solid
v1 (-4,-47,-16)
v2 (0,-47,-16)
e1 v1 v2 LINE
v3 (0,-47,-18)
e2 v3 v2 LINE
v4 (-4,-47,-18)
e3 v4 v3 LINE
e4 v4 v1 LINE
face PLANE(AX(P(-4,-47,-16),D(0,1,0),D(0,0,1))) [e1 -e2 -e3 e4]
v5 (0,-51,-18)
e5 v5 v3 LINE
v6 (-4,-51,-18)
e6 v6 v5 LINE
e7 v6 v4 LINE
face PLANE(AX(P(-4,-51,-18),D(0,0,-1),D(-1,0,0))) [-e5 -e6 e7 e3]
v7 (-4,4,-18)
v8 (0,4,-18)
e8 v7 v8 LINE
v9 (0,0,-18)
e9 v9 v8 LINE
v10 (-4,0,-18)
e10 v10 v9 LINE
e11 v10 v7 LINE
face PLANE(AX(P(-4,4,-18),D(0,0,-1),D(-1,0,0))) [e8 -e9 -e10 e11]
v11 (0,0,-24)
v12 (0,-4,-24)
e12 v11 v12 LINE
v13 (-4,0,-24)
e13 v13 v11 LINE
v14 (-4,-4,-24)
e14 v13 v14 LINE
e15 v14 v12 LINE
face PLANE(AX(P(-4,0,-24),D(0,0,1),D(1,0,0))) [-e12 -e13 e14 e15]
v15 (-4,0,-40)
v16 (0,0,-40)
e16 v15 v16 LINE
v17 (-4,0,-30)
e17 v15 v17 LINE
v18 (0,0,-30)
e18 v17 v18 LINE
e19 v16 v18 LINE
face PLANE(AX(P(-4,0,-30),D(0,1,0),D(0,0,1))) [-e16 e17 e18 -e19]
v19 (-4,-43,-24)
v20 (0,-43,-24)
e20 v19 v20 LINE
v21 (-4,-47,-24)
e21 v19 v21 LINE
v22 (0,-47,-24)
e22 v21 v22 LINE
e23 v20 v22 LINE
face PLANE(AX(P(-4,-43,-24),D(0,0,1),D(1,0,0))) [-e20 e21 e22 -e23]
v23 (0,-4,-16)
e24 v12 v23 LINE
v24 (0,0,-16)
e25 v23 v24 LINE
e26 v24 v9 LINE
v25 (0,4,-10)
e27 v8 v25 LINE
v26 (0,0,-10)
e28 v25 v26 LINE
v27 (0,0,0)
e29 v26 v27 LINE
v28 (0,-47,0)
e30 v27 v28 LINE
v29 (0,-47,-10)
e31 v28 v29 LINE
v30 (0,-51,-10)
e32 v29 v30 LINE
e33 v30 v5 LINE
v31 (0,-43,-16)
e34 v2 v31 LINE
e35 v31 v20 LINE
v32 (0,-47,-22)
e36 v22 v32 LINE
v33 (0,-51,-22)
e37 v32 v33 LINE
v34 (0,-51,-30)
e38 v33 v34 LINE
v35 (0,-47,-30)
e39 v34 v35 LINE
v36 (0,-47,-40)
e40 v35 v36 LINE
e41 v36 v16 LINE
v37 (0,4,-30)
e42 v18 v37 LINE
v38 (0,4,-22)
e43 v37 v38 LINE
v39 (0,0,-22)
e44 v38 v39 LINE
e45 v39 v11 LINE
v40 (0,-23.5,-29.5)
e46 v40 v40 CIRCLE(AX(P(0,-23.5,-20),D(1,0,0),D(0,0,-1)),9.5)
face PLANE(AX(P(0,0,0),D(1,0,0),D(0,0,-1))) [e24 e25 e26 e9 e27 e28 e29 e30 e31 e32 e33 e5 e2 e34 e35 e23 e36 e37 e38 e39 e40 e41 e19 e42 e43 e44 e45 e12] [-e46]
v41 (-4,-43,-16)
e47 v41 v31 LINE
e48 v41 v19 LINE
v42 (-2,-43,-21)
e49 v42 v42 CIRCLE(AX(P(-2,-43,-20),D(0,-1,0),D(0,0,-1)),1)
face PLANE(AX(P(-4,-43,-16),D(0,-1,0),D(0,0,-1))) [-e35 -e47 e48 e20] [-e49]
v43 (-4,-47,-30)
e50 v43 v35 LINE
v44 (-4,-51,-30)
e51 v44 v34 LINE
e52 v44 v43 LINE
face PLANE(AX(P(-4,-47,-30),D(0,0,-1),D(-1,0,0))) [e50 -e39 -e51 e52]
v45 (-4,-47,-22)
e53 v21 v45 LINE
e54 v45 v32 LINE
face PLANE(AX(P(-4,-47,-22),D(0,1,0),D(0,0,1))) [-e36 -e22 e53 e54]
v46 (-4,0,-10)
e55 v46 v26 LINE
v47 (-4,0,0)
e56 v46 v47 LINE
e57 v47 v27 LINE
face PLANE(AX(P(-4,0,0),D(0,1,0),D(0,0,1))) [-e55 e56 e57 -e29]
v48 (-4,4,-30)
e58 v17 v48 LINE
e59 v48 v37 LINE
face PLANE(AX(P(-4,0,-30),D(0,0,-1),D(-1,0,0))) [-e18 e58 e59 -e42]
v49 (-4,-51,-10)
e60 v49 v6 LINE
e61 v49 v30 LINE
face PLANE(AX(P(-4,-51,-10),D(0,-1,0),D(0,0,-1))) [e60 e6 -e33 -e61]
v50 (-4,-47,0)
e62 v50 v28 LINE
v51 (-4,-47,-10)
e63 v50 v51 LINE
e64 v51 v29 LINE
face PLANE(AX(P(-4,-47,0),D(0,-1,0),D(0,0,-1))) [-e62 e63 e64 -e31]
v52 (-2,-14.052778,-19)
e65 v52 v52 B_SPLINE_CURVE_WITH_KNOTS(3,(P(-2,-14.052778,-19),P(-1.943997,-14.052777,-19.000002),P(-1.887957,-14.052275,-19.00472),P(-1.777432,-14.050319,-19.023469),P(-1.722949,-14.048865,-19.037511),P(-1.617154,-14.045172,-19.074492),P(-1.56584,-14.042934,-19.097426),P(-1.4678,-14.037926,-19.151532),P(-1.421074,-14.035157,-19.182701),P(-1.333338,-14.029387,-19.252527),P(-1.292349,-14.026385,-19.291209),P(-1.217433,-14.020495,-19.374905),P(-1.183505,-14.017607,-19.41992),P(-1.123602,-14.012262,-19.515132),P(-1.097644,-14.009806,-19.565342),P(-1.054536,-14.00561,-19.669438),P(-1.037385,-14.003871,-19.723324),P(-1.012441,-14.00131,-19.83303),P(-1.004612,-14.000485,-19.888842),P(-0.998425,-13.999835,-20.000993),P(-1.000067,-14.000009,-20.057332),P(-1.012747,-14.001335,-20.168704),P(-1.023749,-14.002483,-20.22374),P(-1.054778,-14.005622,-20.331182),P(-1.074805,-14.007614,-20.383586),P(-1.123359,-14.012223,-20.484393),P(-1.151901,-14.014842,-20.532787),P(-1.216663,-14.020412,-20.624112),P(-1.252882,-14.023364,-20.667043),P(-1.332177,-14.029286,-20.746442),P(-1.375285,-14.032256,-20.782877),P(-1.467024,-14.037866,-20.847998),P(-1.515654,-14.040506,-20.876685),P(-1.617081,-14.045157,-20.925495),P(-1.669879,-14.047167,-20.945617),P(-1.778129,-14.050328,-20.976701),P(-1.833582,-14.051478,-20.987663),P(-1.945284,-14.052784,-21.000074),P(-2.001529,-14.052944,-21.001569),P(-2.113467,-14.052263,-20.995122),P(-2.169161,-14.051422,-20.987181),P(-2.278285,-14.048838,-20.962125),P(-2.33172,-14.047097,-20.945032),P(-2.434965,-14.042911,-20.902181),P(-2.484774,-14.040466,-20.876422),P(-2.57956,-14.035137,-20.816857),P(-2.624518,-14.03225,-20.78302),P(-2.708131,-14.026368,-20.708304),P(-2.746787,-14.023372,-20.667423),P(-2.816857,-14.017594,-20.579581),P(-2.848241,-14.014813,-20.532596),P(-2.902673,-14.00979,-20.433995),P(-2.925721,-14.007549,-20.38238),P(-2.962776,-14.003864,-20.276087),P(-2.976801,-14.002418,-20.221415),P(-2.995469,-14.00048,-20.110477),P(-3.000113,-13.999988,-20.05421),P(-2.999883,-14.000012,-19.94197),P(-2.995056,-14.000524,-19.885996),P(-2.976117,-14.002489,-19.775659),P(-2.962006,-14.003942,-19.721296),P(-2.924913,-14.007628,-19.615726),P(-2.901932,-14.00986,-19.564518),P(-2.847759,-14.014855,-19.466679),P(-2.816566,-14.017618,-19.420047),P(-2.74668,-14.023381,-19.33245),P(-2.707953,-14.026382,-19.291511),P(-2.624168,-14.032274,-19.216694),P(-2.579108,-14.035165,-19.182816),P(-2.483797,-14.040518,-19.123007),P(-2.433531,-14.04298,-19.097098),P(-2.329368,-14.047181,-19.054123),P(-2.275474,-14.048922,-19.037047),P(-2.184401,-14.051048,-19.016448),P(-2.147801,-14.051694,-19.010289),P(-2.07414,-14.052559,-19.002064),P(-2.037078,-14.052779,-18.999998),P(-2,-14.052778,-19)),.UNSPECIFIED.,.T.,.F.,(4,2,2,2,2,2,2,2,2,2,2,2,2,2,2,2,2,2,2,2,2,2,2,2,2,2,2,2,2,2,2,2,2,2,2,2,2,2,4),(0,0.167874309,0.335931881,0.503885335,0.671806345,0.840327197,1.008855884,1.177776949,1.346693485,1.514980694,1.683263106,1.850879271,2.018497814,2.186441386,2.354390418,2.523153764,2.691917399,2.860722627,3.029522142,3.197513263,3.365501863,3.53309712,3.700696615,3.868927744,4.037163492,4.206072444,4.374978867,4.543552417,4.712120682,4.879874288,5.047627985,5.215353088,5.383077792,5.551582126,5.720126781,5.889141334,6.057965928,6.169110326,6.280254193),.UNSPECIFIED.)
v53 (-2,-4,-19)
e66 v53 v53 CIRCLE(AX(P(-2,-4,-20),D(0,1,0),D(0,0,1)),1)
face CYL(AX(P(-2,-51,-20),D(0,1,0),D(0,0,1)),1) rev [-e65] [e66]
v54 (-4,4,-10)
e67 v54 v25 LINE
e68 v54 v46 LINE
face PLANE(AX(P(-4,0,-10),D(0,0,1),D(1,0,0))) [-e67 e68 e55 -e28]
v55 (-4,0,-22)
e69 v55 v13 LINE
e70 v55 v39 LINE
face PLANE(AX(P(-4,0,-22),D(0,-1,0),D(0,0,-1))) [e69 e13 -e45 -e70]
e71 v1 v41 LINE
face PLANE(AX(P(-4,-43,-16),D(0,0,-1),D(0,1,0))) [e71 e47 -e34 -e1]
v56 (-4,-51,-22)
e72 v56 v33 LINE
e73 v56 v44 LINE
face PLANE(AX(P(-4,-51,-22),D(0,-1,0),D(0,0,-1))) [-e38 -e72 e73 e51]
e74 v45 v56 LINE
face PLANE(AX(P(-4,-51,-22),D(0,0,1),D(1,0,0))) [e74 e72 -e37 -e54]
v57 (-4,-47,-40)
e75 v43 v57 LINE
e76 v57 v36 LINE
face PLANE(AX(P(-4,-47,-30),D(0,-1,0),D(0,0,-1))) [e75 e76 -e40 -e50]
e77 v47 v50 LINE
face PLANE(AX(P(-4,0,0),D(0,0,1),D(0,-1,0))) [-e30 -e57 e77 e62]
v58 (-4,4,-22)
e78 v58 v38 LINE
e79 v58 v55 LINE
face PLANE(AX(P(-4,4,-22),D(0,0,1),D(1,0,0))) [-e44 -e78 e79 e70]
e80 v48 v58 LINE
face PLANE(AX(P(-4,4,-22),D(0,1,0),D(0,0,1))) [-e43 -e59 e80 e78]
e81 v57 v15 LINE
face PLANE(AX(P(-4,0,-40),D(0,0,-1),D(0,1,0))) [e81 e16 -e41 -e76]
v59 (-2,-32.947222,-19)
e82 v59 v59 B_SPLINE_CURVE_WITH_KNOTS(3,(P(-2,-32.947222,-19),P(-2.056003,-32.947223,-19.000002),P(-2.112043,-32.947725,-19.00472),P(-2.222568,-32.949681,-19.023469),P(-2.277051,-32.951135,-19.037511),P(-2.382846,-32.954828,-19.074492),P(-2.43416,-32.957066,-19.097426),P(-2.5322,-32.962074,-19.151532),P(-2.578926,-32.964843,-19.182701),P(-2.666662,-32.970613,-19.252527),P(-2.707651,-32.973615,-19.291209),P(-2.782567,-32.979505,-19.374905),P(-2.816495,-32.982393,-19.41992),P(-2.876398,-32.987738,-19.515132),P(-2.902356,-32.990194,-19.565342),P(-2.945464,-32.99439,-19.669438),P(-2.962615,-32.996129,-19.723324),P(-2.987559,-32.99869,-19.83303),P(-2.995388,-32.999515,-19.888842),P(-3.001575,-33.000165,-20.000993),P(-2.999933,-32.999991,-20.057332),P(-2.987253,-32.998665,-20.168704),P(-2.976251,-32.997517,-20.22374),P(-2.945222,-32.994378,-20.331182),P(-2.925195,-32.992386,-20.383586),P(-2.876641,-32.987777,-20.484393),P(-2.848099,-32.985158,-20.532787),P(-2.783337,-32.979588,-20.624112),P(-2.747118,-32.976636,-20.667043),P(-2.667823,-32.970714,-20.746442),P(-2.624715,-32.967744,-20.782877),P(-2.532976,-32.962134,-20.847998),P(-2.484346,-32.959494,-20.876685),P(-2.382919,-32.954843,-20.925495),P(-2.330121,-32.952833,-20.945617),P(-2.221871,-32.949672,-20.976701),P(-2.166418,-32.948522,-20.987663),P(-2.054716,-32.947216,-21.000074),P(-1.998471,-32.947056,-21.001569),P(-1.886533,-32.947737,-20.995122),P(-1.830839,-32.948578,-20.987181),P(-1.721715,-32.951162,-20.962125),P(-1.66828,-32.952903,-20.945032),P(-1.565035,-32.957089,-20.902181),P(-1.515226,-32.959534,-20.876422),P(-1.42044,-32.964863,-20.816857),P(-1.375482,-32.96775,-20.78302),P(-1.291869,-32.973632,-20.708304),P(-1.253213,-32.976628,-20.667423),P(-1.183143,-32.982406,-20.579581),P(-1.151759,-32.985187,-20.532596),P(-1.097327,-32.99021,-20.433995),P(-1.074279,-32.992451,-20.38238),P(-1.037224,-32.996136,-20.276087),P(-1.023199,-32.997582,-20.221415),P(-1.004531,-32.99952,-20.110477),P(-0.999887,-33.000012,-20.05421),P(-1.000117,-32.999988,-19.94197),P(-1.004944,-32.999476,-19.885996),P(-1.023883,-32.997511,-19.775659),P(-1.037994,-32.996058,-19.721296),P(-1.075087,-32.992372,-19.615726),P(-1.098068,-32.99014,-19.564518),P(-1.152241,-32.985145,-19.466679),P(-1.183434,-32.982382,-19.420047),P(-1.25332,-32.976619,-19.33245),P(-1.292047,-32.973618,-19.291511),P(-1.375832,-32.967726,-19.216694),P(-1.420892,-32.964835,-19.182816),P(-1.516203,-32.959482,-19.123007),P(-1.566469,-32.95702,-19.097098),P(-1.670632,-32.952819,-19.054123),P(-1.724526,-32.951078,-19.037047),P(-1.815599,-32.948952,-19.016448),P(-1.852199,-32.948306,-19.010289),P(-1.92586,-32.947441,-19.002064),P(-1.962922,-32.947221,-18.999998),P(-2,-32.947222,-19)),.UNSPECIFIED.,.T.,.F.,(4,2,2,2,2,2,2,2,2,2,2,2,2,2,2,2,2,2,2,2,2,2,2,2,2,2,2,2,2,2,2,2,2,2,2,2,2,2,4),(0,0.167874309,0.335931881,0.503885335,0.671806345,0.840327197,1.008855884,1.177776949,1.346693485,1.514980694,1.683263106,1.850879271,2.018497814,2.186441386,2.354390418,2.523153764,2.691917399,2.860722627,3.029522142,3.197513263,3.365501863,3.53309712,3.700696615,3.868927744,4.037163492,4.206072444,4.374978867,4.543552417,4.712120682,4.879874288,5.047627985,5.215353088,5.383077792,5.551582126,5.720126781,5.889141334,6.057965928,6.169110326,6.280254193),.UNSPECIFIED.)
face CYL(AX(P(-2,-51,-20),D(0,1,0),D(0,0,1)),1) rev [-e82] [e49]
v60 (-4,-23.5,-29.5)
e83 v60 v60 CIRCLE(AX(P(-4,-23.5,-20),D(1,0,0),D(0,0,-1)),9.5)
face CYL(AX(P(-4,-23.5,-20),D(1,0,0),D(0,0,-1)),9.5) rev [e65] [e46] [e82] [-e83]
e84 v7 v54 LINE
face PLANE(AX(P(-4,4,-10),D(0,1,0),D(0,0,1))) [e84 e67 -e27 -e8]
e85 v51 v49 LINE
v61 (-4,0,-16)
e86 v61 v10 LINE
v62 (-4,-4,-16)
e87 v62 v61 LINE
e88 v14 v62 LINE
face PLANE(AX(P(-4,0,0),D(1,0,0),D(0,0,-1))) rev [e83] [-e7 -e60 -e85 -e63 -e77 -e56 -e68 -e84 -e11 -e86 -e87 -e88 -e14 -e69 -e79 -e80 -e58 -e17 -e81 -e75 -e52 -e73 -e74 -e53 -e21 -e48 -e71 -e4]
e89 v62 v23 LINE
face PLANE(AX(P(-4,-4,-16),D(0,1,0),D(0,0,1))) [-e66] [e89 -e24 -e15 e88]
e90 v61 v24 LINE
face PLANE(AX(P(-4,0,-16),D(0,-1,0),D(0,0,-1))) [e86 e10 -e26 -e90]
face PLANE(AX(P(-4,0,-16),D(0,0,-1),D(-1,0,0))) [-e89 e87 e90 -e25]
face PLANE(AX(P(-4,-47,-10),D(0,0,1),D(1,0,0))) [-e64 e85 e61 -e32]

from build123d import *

# Parameters (mm, degrees)
SKETCH_1_R             = 9.5
SM_BASE_FLANGE_1_DEPTH = 4
SKETCH_6_R             = 1
CUT_EXTRUDE_1_DEPTH    = 69.124885321


# Sheet-metal steps are written as plain solids
with BuildPart() as part:
    # Sketch 1 → Базовая кромка1 (new body)
    with BuildSketch(Plane(origin=(0, 0, 0), x_dir=(0, 0, -1), z_dir=(1, 0, 0))):
        Polygon((30, -47), (40, -47), (40, 0), (30, 0), (30, 4), (22, 4), (22, 0), (24, 0), (24, -4), (16, -4), (16, 0), (18, 0), (18, 4), (10, 4), (10, 0), (0, 0), (0, -47), (10, -47), (10, -51), (18, -51), (18, -47), (16, -47), (16, -43), (24, -43), (24, -47), (22, -47), (22, -51), (30, -51), align=None)
        with Locations((20, -23.5)):
            Circle(SKETCH_1_R, mode=Mode.SUBTRACT)
    extrude(amount=-SM_BASE_FLANGE_1_DEPTH)

    # Эскиз6 → Вырез-Вытянуть1 (cut, through all)
    with BuildSketch(Plane(origin=(0, 4, 0), x_dir=(1, 0, 0), z_dir=(0, 1, 0))):
        with Locations(Location((-2, 20, 0), (0, 0, 270))):
            Circle(SKETCH_6_R)
    extrude(amount=-CUT_EXTRUDE_1_DEPTH, mode=Mode.SUBTRACT)


solid = part.part
